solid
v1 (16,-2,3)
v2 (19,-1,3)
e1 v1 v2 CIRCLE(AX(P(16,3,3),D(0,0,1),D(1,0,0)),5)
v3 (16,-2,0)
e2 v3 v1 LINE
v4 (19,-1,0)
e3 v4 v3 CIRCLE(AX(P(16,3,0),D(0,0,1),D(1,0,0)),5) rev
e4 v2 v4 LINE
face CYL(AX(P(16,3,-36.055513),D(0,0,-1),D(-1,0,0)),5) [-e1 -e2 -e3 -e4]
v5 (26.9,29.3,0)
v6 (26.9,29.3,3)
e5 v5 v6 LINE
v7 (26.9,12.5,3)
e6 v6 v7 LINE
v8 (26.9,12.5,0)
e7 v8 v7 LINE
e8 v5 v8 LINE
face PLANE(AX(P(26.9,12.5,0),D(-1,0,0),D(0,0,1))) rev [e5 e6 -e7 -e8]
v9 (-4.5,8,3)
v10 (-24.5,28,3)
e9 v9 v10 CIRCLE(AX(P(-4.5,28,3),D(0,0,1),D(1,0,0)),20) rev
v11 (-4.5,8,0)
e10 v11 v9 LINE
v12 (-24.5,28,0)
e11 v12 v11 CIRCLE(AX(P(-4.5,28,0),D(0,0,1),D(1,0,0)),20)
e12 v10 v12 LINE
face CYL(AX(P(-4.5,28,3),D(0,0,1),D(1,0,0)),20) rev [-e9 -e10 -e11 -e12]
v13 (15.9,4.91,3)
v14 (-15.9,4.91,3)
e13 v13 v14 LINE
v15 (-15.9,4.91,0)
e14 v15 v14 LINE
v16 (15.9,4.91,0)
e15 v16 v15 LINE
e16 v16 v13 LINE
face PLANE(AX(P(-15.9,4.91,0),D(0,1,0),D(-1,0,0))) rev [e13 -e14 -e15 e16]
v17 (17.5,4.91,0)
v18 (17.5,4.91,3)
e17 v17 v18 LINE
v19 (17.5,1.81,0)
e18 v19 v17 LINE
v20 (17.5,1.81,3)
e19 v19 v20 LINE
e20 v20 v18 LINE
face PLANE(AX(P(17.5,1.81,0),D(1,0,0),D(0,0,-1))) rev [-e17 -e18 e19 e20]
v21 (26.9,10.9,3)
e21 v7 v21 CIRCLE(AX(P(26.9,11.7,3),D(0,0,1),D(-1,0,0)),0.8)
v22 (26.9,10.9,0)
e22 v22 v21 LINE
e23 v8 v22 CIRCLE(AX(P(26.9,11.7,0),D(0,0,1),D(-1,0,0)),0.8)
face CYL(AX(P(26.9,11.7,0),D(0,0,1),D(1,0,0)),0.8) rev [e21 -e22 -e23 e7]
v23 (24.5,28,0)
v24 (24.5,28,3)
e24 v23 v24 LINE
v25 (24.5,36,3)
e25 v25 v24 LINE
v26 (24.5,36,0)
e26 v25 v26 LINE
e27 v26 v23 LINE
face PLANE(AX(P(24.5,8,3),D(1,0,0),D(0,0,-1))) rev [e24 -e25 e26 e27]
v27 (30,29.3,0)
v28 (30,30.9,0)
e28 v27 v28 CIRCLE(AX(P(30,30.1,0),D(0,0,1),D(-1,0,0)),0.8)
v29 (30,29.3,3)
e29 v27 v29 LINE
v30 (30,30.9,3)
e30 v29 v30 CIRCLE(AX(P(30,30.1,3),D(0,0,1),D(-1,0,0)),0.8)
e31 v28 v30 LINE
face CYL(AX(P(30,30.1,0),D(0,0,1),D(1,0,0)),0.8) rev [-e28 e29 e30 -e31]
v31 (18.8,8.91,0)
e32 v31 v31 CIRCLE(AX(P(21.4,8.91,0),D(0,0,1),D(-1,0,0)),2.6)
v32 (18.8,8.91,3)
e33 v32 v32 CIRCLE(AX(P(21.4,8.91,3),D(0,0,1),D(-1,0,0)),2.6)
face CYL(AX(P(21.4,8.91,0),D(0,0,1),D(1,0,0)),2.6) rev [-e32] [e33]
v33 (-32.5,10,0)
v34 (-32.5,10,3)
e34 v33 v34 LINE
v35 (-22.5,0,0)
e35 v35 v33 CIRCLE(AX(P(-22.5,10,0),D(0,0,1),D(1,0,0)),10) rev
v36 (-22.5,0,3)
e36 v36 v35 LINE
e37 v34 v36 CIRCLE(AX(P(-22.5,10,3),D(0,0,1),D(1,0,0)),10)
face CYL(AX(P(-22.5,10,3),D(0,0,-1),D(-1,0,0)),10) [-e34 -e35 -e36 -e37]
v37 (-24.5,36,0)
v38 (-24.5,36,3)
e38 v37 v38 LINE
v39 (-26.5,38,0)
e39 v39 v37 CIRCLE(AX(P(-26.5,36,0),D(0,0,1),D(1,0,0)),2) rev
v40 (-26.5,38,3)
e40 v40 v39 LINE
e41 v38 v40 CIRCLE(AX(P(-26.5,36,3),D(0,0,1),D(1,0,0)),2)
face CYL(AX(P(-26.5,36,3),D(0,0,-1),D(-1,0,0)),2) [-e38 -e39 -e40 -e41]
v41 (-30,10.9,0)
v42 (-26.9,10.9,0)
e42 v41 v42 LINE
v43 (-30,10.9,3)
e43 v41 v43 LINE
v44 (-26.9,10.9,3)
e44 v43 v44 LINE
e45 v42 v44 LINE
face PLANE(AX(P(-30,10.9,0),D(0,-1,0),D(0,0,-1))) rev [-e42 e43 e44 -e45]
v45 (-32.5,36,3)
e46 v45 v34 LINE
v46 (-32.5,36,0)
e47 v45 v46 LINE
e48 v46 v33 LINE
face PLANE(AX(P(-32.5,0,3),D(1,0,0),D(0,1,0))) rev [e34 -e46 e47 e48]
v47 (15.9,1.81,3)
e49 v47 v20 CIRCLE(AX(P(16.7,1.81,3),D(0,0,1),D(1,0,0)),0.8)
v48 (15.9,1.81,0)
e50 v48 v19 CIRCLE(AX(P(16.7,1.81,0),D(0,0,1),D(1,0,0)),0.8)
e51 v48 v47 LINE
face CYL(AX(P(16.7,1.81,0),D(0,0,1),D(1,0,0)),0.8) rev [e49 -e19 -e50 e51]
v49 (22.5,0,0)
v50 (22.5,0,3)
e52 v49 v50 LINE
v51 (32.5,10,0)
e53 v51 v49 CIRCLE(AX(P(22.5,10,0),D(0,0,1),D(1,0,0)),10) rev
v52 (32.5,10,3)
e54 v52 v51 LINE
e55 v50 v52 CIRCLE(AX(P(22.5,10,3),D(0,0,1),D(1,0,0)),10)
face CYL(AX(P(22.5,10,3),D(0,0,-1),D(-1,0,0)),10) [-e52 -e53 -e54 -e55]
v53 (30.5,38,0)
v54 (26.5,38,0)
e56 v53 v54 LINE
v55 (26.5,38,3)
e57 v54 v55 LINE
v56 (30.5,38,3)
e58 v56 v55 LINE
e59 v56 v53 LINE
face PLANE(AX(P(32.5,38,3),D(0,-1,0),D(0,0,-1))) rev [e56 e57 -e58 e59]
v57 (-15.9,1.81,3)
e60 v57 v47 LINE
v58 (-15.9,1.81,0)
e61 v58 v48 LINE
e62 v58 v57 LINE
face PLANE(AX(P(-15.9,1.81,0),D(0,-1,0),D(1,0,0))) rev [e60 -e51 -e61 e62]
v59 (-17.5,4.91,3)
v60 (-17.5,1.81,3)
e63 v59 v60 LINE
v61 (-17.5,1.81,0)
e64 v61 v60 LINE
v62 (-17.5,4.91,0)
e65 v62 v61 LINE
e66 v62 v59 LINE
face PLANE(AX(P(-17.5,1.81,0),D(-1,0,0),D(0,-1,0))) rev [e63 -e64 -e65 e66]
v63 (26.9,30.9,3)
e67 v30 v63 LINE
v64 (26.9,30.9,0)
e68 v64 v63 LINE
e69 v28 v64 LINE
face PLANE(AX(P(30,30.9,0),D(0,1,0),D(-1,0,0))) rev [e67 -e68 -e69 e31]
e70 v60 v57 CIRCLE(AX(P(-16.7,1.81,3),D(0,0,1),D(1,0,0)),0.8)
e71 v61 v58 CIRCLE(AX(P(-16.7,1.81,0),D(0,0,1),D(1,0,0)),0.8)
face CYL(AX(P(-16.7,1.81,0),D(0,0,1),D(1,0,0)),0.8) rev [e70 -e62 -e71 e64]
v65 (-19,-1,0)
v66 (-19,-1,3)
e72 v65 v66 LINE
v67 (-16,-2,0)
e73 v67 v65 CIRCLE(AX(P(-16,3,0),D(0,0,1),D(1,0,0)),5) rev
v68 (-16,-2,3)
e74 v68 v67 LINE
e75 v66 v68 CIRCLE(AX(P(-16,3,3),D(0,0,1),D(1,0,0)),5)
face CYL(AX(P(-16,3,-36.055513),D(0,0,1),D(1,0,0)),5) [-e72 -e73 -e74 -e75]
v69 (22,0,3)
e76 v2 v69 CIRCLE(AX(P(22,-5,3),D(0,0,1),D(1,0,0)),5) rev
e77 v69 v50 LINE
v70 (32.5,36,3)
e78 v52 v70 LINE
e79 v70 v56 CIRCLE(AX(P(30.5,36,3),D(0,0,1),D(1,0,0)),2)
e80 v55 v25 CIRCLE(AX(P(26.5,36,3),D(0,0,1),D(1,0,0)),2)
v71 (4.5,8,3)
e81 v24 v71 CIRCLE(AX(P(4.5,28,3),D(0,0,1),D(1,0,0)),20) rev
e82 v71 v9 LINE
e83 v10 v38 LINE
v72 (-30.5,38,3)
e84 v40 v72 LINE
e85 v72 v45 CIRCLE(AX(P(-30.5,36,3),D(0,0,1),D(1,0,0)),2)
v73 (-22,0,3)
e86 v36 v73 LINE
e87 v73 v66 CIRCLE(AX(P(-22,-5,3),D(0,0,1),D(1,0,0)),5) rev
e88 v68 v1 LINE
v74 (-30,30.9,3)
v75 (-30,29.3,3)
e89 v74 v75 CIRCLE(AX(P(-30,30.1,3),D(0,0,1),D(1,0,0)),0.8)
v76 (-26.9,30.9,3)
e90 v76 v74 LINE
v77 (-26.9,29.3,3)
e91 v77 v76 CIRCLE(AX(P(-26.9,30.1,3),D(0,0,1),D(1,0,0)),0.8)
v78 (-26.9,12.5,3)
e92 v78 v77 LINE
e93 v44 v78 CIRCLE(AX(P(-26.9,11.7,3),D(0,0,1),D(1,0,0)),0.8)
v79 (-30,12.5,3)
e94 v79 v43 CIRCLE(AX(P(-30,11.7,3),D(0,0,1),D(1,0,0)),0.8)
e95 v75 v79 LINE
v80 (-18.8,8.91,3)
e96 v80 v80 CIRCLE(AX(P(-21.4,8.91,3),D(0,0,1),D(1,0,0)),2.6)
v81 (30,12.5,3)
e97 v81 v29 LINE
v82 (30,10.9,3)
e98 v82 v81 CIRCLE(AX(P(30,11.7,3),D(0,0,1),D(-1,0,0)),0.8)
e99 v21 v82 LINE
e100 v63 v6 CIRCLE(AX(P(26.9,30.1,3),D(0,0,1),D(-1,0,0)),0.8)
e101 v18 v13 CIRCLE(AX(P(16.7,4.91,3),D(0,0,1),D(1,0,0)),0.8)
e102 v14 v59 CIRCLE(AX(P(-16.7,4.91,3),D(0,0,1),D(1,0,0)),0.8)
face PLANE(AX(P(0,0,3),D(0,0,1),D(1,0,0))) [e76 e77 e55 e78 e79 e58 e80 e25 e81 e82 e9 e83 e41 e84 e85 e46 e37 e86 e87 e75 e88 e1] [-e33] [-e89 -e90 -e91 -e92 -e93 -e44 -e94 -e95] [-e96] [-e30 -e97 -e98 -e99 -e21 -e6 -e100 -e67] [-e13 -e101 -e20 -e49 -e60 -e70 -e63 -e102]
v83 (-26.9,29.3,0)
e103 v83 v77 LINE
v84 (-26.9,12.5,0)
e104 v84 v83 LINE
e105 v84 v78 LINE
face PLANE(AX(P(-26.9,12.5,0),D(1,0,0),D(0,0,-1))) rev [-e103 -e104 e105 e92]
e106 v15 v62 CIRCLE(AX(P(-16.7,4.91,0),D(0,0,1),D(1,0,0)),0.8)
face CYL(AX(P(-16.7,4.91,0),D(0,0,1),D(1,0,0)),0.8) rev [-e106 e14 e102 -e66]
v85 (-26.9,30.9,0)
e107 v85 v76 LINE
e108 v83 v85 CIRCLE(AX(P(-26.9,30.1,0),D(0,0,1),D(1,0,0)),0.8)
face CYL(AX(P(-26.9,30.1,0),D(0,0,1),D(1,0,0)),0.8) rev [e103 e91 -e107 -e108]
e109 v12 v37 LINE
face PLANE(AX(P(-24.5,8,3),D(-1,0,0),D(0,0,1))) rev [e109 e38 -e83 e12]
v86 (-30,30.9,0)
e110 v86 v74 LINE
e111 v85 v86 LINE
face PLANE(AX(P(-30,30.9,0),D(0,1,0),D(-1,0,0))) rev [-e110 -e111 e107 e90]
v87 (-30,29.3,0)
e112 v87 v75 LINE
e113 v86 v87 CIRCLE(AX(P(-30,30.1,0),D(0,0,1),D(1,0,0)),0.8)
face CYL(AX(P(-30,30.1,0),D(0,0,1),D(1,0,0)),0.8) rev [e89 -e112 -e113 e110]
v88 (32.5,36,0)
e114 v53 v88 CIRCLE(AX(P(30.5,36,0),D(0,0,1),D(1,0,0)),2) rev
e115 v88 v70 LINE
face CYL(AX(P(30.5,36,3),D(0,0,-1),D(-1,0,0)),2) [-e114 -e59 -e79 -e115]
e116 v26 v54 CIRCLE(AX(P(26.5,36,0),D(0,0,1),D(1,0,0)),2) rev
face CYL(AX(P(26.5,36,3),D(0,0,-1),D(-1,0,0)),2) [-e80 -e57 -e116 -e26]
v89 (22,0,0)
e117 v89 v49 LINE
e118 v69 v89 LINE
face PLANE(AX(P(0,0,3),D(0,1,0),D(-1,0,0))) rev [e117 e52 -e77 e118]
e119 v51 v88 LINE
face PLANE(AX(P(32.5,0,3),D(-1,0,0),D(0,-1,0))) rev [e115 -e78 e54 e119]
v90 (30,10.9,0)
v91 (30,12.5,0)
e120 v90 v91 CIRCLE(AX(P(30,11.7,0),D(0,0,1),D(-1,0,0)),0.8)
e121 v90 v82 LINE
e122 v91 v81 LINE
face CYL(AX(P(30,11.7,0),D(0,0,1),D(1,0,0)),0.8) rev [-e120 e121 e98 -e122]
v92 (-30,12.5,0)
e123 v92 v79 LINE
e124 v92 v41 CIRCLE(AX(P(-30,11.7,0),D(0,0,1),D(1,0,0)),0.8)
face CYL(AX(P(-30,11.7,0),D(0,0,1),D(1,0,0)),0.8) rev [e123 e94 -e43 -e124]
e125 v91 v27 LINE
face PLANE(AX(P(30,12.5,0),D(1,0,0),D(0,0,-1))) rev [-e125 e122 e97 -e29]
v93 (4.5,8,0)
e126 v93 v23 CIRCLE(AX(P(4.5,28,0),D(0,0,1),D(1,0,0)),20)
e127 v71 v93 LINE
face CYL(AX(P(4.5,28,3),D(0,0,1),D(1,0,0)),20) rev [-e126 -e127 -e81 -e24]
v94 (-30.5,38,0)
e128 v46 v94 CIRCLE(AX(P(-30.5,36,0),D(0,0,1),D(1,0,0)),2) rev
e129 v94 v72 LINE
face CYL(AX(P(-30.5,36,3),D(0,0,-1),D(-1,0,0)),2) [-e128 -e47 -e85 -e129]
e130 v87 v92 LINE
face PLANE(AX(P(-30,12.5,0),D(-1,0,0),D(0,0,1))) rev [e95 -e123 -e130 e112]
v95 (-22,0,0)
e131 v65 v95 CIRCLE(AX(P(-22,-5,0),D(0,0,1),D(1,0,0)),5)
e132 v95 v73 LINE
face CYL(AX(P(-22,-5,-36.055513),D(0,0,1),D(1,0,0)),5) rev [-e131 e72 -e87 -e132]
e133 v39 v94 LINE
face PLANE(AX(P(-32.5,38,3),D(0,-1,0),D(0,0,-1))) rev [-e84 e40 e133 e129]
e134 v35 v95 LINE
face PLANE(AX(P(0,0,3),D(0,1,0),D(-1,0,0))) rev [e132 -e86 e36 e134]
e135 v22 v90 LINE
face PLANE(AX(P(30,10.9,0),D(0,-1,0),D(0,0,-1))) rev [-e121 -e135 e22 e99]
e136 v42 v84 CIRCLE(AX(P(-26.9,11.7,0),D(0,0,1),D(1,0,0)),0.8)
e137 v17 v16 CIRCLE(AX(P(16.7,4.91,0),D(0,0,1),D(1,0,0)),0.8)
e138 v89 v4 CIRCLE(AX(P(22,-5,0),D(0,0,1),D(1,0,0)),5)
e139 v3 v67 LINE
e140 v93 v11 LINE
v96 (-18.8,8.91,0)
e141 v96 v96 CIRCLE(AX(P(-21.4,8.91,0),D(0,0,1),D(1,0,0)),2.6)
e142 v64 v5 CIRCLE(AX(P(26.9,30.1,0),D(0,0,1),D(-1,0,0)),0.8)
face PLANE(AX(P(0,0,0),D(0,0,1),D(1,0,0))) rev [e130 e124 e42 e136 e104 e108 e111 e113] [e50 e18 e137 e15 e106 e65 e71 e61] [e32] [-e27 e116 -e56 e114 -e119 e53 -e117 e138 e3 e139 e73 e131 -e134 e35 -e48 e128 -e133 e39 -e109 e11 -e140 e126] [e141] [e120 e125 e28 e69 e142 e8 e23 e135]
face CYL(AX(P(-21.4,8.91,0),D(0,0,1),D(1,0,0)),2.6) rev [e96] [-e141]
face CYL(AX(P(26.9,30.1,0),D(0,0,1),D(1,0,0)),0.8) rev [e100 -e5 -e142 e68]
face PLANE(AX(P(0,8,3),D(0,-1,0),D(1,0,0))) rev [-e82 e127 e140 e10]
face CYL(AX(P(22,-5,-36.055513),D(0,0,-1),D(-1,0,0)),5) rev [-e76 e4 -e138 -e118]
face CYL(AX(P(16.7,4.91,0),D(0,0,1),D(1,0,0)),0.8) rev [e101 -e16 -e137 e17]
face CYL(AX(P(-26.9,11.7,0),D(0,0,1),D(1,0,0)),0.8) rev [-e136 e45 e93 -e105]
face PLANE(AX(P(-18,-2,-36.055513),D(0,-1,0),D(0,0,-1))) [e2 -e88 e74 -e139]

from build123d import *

# Parameters (mm, degrees)
BOSS_EXTRUDE1_DEPTH = 3
FILLET1_R           = 20
CUT_EXTRUDE1_DEPTH  = 51.092414595
SKETCH3_R           = 2.6
CUT_EXTRUDE2_DEPTH  = 51.092414595
FILLET2_R           = 10
FILLET3_R           = 2
SKETCH4_W           = 36
SKETCH4_H           = 2
BOSS_EXTRUDE2_DEPTH = 3
FILLET4_R           = 5
FILLET5_R           = 5


with BuildPart() as part:
    # Sketch1 → Boss-Extrude1 (new body)
    with BuildSketch(Plane.XY):
        Polygon((0, 0), (-32.5, 0), (-32.5, 38), (-24.5, 38), (-24.5, 8), (0, 8), (24.5, 8), (24.5, 38), (32.5, 38), (32.5, 0), align=None)
    extrude(amount=BOSS_EXTRUDE1_DEPTH)

    # Fillet1
    fillet1_edges = [part.edges().sort_by_distance(p)[0] for p in [
        (24.5, 8, 1.5),
        (-24.5, 8, 1.5),
    ]]
    fillet(fillet1_edges, radius=FILLET1_R)

    # Sketch2 → Cut-Extrude1 (cut, through all)
    with BuildSketch(Plane.XY.offset(3)):
        with BuildLine():
            Line((-30, 10.9), (-26.9, 10.9))
            ThreePointArc((-26.9, 10.9), (-26.1, 11.7), (-26.9, 12.5))
            Line((-26.9, 12.5), (-26.9, 29.3))
            ThreePointArc((-26.9, 29.3), (-26.1, 30.1), (-26.9, 30.9))
            Line((-26.9, 30.9), (-30, 30.9))
            ThreePointArc((-30, 30.9), (-30.8, 30.1), (-30, 29.3))
            Line((-30, 29.3), (-30, 12.5))
            ThreePointArc((-30, 12.5), (-30.8, 11.7), (-30, 10.9))
        make_face()
        with BuildLine():
            Line((26.9, 12.5), (26.9, 29.3))
            ThreePointArc((26.9, 29.3), (26.1, 30.1), (26.9, 30.9))
            Line((26.9, 30.9), (30, 30.9))
            ThreePointArc((30, 30.9), (30.8, 30.1), (30, 29.3))
            Line((30, 29.3), (30, 12.5))
            ThreePointArc((30, 12.5), (30.8, 11.7), (30, 10.9))
            Line((30, 10.9), (26.9, 10.9))
            ThreePointArc((26.9, 10.9), (26.1, 11.7), (26.9, 12.5))
        make_face()
        with BuildLine():
            Line((-15.9, 1.81), (15.9, 1.81))
            ThreePointArc((15.9, 1.81), (16.7, 1.01), (17.5, 1.81))
            Line((17.5, 1.81), (17.5, 4.91))
            ThreePointArc((17.5, 4.91), (16.7, 5.71), (15.9, 4.91))
            Line((15.9, 4.91), (-15.9, 4.91))
            ThreePointArc((-15.9, 4.91), (-16.7, 5.71), (-17.5, 4.91))
            Line((-17.5, 4.91), (-17.5, 1.81))
            ThreePointArc((-17.5, 1.81), (-16.7, 1.01), (-15.9, 1.81))
        make_face()
    extrude(amount=-CUT_EXTRUDE1_DEPTH, mode=Mode.SUBTRACT)

    # Sketch3 → Cut-Extrude2 (cut, through all)
    with BuildSketch(Plane.XY.offset(3)):
        with Locations((-21.4, 8.91)):
            Circle(SKETCH3_R)
        with Locations(Location((21.4, 8.91, 0), (0, 0, 180))):
            Circle(SKETCH3_R)
    extrude(amount=-CUT_EXTRUDE2_DEPTH, mode=Mode.SUBTRACT)

    # Fillet2
    fillet2_edges = [part.edges().sort_by_distance(p)[0] for p in [
        (32.5, 0, 1.5),
        (-32.5, 0, 1.5),
    ]]
    fillet(fillet2_edges, radius=FILLET2_R)

    # Fillet3
    fillet3_edges = [part.edges().sort_by_distance(p)[0] for p in [
        (24.5, 38, 1.5),
        (32.5, 38, 1.5),
        (-32.5, 38, 1.5),
        (-24.5, 38, 1.5),
    ]]
    fillet(fillet3_edges, radius=FILLET3_R)

    # Sketch4 → Boss-Extrude2 (add)
    with BuildSketch(Plane.XY.offset(3)):
        with Locations((0, -1)):
            Rectangle(SKETCH4_W, SKETCH4_H)
    extrude(amount=-BOSS_EXTRUDE2_DEPTH)

    # Fillet4
    # the kernel refuses this fillet: 5 mm, written as the material it adds along each edge
    with BuildSketch(Plane(origin=(-18, 0, 3), x_dir=(-1, 0, 0), z_dir=(0, 0, -1))) as fillet4_piece_1:
        with BuildLine():
            CenterArc((4, -5), FILLET4_R, 90, 53.130102354)
            Line((0, -2), (0, 0))
            Line((0, 0), (4, 0))
        make_face()
    extrude(amount=3)
    with BuildSketch(Plane(origin=(18, 0, 3), x_dir=(1, 0, 0), z_dir=(0, 0, -1))) as fillet4_piece_2:
        with BuildLine():
            CenterArc((4, 5), FILLET4_R, 216.869897646, 53.130102354)
            Line((0, 2), (0, 0))
            Line((0, 0), (4, 0))
        make_face()
    extrude(amount=3)

    # Fillet5
    fillet5_edges = [part.edges().sort_by_distance(p)[0] for p in [
        (-18, -2, 1.5),
        (18, -2, 1.5),
    ]]
    fillet(fillet5_edges, radius=FILLET5_R)


solid = part.part
